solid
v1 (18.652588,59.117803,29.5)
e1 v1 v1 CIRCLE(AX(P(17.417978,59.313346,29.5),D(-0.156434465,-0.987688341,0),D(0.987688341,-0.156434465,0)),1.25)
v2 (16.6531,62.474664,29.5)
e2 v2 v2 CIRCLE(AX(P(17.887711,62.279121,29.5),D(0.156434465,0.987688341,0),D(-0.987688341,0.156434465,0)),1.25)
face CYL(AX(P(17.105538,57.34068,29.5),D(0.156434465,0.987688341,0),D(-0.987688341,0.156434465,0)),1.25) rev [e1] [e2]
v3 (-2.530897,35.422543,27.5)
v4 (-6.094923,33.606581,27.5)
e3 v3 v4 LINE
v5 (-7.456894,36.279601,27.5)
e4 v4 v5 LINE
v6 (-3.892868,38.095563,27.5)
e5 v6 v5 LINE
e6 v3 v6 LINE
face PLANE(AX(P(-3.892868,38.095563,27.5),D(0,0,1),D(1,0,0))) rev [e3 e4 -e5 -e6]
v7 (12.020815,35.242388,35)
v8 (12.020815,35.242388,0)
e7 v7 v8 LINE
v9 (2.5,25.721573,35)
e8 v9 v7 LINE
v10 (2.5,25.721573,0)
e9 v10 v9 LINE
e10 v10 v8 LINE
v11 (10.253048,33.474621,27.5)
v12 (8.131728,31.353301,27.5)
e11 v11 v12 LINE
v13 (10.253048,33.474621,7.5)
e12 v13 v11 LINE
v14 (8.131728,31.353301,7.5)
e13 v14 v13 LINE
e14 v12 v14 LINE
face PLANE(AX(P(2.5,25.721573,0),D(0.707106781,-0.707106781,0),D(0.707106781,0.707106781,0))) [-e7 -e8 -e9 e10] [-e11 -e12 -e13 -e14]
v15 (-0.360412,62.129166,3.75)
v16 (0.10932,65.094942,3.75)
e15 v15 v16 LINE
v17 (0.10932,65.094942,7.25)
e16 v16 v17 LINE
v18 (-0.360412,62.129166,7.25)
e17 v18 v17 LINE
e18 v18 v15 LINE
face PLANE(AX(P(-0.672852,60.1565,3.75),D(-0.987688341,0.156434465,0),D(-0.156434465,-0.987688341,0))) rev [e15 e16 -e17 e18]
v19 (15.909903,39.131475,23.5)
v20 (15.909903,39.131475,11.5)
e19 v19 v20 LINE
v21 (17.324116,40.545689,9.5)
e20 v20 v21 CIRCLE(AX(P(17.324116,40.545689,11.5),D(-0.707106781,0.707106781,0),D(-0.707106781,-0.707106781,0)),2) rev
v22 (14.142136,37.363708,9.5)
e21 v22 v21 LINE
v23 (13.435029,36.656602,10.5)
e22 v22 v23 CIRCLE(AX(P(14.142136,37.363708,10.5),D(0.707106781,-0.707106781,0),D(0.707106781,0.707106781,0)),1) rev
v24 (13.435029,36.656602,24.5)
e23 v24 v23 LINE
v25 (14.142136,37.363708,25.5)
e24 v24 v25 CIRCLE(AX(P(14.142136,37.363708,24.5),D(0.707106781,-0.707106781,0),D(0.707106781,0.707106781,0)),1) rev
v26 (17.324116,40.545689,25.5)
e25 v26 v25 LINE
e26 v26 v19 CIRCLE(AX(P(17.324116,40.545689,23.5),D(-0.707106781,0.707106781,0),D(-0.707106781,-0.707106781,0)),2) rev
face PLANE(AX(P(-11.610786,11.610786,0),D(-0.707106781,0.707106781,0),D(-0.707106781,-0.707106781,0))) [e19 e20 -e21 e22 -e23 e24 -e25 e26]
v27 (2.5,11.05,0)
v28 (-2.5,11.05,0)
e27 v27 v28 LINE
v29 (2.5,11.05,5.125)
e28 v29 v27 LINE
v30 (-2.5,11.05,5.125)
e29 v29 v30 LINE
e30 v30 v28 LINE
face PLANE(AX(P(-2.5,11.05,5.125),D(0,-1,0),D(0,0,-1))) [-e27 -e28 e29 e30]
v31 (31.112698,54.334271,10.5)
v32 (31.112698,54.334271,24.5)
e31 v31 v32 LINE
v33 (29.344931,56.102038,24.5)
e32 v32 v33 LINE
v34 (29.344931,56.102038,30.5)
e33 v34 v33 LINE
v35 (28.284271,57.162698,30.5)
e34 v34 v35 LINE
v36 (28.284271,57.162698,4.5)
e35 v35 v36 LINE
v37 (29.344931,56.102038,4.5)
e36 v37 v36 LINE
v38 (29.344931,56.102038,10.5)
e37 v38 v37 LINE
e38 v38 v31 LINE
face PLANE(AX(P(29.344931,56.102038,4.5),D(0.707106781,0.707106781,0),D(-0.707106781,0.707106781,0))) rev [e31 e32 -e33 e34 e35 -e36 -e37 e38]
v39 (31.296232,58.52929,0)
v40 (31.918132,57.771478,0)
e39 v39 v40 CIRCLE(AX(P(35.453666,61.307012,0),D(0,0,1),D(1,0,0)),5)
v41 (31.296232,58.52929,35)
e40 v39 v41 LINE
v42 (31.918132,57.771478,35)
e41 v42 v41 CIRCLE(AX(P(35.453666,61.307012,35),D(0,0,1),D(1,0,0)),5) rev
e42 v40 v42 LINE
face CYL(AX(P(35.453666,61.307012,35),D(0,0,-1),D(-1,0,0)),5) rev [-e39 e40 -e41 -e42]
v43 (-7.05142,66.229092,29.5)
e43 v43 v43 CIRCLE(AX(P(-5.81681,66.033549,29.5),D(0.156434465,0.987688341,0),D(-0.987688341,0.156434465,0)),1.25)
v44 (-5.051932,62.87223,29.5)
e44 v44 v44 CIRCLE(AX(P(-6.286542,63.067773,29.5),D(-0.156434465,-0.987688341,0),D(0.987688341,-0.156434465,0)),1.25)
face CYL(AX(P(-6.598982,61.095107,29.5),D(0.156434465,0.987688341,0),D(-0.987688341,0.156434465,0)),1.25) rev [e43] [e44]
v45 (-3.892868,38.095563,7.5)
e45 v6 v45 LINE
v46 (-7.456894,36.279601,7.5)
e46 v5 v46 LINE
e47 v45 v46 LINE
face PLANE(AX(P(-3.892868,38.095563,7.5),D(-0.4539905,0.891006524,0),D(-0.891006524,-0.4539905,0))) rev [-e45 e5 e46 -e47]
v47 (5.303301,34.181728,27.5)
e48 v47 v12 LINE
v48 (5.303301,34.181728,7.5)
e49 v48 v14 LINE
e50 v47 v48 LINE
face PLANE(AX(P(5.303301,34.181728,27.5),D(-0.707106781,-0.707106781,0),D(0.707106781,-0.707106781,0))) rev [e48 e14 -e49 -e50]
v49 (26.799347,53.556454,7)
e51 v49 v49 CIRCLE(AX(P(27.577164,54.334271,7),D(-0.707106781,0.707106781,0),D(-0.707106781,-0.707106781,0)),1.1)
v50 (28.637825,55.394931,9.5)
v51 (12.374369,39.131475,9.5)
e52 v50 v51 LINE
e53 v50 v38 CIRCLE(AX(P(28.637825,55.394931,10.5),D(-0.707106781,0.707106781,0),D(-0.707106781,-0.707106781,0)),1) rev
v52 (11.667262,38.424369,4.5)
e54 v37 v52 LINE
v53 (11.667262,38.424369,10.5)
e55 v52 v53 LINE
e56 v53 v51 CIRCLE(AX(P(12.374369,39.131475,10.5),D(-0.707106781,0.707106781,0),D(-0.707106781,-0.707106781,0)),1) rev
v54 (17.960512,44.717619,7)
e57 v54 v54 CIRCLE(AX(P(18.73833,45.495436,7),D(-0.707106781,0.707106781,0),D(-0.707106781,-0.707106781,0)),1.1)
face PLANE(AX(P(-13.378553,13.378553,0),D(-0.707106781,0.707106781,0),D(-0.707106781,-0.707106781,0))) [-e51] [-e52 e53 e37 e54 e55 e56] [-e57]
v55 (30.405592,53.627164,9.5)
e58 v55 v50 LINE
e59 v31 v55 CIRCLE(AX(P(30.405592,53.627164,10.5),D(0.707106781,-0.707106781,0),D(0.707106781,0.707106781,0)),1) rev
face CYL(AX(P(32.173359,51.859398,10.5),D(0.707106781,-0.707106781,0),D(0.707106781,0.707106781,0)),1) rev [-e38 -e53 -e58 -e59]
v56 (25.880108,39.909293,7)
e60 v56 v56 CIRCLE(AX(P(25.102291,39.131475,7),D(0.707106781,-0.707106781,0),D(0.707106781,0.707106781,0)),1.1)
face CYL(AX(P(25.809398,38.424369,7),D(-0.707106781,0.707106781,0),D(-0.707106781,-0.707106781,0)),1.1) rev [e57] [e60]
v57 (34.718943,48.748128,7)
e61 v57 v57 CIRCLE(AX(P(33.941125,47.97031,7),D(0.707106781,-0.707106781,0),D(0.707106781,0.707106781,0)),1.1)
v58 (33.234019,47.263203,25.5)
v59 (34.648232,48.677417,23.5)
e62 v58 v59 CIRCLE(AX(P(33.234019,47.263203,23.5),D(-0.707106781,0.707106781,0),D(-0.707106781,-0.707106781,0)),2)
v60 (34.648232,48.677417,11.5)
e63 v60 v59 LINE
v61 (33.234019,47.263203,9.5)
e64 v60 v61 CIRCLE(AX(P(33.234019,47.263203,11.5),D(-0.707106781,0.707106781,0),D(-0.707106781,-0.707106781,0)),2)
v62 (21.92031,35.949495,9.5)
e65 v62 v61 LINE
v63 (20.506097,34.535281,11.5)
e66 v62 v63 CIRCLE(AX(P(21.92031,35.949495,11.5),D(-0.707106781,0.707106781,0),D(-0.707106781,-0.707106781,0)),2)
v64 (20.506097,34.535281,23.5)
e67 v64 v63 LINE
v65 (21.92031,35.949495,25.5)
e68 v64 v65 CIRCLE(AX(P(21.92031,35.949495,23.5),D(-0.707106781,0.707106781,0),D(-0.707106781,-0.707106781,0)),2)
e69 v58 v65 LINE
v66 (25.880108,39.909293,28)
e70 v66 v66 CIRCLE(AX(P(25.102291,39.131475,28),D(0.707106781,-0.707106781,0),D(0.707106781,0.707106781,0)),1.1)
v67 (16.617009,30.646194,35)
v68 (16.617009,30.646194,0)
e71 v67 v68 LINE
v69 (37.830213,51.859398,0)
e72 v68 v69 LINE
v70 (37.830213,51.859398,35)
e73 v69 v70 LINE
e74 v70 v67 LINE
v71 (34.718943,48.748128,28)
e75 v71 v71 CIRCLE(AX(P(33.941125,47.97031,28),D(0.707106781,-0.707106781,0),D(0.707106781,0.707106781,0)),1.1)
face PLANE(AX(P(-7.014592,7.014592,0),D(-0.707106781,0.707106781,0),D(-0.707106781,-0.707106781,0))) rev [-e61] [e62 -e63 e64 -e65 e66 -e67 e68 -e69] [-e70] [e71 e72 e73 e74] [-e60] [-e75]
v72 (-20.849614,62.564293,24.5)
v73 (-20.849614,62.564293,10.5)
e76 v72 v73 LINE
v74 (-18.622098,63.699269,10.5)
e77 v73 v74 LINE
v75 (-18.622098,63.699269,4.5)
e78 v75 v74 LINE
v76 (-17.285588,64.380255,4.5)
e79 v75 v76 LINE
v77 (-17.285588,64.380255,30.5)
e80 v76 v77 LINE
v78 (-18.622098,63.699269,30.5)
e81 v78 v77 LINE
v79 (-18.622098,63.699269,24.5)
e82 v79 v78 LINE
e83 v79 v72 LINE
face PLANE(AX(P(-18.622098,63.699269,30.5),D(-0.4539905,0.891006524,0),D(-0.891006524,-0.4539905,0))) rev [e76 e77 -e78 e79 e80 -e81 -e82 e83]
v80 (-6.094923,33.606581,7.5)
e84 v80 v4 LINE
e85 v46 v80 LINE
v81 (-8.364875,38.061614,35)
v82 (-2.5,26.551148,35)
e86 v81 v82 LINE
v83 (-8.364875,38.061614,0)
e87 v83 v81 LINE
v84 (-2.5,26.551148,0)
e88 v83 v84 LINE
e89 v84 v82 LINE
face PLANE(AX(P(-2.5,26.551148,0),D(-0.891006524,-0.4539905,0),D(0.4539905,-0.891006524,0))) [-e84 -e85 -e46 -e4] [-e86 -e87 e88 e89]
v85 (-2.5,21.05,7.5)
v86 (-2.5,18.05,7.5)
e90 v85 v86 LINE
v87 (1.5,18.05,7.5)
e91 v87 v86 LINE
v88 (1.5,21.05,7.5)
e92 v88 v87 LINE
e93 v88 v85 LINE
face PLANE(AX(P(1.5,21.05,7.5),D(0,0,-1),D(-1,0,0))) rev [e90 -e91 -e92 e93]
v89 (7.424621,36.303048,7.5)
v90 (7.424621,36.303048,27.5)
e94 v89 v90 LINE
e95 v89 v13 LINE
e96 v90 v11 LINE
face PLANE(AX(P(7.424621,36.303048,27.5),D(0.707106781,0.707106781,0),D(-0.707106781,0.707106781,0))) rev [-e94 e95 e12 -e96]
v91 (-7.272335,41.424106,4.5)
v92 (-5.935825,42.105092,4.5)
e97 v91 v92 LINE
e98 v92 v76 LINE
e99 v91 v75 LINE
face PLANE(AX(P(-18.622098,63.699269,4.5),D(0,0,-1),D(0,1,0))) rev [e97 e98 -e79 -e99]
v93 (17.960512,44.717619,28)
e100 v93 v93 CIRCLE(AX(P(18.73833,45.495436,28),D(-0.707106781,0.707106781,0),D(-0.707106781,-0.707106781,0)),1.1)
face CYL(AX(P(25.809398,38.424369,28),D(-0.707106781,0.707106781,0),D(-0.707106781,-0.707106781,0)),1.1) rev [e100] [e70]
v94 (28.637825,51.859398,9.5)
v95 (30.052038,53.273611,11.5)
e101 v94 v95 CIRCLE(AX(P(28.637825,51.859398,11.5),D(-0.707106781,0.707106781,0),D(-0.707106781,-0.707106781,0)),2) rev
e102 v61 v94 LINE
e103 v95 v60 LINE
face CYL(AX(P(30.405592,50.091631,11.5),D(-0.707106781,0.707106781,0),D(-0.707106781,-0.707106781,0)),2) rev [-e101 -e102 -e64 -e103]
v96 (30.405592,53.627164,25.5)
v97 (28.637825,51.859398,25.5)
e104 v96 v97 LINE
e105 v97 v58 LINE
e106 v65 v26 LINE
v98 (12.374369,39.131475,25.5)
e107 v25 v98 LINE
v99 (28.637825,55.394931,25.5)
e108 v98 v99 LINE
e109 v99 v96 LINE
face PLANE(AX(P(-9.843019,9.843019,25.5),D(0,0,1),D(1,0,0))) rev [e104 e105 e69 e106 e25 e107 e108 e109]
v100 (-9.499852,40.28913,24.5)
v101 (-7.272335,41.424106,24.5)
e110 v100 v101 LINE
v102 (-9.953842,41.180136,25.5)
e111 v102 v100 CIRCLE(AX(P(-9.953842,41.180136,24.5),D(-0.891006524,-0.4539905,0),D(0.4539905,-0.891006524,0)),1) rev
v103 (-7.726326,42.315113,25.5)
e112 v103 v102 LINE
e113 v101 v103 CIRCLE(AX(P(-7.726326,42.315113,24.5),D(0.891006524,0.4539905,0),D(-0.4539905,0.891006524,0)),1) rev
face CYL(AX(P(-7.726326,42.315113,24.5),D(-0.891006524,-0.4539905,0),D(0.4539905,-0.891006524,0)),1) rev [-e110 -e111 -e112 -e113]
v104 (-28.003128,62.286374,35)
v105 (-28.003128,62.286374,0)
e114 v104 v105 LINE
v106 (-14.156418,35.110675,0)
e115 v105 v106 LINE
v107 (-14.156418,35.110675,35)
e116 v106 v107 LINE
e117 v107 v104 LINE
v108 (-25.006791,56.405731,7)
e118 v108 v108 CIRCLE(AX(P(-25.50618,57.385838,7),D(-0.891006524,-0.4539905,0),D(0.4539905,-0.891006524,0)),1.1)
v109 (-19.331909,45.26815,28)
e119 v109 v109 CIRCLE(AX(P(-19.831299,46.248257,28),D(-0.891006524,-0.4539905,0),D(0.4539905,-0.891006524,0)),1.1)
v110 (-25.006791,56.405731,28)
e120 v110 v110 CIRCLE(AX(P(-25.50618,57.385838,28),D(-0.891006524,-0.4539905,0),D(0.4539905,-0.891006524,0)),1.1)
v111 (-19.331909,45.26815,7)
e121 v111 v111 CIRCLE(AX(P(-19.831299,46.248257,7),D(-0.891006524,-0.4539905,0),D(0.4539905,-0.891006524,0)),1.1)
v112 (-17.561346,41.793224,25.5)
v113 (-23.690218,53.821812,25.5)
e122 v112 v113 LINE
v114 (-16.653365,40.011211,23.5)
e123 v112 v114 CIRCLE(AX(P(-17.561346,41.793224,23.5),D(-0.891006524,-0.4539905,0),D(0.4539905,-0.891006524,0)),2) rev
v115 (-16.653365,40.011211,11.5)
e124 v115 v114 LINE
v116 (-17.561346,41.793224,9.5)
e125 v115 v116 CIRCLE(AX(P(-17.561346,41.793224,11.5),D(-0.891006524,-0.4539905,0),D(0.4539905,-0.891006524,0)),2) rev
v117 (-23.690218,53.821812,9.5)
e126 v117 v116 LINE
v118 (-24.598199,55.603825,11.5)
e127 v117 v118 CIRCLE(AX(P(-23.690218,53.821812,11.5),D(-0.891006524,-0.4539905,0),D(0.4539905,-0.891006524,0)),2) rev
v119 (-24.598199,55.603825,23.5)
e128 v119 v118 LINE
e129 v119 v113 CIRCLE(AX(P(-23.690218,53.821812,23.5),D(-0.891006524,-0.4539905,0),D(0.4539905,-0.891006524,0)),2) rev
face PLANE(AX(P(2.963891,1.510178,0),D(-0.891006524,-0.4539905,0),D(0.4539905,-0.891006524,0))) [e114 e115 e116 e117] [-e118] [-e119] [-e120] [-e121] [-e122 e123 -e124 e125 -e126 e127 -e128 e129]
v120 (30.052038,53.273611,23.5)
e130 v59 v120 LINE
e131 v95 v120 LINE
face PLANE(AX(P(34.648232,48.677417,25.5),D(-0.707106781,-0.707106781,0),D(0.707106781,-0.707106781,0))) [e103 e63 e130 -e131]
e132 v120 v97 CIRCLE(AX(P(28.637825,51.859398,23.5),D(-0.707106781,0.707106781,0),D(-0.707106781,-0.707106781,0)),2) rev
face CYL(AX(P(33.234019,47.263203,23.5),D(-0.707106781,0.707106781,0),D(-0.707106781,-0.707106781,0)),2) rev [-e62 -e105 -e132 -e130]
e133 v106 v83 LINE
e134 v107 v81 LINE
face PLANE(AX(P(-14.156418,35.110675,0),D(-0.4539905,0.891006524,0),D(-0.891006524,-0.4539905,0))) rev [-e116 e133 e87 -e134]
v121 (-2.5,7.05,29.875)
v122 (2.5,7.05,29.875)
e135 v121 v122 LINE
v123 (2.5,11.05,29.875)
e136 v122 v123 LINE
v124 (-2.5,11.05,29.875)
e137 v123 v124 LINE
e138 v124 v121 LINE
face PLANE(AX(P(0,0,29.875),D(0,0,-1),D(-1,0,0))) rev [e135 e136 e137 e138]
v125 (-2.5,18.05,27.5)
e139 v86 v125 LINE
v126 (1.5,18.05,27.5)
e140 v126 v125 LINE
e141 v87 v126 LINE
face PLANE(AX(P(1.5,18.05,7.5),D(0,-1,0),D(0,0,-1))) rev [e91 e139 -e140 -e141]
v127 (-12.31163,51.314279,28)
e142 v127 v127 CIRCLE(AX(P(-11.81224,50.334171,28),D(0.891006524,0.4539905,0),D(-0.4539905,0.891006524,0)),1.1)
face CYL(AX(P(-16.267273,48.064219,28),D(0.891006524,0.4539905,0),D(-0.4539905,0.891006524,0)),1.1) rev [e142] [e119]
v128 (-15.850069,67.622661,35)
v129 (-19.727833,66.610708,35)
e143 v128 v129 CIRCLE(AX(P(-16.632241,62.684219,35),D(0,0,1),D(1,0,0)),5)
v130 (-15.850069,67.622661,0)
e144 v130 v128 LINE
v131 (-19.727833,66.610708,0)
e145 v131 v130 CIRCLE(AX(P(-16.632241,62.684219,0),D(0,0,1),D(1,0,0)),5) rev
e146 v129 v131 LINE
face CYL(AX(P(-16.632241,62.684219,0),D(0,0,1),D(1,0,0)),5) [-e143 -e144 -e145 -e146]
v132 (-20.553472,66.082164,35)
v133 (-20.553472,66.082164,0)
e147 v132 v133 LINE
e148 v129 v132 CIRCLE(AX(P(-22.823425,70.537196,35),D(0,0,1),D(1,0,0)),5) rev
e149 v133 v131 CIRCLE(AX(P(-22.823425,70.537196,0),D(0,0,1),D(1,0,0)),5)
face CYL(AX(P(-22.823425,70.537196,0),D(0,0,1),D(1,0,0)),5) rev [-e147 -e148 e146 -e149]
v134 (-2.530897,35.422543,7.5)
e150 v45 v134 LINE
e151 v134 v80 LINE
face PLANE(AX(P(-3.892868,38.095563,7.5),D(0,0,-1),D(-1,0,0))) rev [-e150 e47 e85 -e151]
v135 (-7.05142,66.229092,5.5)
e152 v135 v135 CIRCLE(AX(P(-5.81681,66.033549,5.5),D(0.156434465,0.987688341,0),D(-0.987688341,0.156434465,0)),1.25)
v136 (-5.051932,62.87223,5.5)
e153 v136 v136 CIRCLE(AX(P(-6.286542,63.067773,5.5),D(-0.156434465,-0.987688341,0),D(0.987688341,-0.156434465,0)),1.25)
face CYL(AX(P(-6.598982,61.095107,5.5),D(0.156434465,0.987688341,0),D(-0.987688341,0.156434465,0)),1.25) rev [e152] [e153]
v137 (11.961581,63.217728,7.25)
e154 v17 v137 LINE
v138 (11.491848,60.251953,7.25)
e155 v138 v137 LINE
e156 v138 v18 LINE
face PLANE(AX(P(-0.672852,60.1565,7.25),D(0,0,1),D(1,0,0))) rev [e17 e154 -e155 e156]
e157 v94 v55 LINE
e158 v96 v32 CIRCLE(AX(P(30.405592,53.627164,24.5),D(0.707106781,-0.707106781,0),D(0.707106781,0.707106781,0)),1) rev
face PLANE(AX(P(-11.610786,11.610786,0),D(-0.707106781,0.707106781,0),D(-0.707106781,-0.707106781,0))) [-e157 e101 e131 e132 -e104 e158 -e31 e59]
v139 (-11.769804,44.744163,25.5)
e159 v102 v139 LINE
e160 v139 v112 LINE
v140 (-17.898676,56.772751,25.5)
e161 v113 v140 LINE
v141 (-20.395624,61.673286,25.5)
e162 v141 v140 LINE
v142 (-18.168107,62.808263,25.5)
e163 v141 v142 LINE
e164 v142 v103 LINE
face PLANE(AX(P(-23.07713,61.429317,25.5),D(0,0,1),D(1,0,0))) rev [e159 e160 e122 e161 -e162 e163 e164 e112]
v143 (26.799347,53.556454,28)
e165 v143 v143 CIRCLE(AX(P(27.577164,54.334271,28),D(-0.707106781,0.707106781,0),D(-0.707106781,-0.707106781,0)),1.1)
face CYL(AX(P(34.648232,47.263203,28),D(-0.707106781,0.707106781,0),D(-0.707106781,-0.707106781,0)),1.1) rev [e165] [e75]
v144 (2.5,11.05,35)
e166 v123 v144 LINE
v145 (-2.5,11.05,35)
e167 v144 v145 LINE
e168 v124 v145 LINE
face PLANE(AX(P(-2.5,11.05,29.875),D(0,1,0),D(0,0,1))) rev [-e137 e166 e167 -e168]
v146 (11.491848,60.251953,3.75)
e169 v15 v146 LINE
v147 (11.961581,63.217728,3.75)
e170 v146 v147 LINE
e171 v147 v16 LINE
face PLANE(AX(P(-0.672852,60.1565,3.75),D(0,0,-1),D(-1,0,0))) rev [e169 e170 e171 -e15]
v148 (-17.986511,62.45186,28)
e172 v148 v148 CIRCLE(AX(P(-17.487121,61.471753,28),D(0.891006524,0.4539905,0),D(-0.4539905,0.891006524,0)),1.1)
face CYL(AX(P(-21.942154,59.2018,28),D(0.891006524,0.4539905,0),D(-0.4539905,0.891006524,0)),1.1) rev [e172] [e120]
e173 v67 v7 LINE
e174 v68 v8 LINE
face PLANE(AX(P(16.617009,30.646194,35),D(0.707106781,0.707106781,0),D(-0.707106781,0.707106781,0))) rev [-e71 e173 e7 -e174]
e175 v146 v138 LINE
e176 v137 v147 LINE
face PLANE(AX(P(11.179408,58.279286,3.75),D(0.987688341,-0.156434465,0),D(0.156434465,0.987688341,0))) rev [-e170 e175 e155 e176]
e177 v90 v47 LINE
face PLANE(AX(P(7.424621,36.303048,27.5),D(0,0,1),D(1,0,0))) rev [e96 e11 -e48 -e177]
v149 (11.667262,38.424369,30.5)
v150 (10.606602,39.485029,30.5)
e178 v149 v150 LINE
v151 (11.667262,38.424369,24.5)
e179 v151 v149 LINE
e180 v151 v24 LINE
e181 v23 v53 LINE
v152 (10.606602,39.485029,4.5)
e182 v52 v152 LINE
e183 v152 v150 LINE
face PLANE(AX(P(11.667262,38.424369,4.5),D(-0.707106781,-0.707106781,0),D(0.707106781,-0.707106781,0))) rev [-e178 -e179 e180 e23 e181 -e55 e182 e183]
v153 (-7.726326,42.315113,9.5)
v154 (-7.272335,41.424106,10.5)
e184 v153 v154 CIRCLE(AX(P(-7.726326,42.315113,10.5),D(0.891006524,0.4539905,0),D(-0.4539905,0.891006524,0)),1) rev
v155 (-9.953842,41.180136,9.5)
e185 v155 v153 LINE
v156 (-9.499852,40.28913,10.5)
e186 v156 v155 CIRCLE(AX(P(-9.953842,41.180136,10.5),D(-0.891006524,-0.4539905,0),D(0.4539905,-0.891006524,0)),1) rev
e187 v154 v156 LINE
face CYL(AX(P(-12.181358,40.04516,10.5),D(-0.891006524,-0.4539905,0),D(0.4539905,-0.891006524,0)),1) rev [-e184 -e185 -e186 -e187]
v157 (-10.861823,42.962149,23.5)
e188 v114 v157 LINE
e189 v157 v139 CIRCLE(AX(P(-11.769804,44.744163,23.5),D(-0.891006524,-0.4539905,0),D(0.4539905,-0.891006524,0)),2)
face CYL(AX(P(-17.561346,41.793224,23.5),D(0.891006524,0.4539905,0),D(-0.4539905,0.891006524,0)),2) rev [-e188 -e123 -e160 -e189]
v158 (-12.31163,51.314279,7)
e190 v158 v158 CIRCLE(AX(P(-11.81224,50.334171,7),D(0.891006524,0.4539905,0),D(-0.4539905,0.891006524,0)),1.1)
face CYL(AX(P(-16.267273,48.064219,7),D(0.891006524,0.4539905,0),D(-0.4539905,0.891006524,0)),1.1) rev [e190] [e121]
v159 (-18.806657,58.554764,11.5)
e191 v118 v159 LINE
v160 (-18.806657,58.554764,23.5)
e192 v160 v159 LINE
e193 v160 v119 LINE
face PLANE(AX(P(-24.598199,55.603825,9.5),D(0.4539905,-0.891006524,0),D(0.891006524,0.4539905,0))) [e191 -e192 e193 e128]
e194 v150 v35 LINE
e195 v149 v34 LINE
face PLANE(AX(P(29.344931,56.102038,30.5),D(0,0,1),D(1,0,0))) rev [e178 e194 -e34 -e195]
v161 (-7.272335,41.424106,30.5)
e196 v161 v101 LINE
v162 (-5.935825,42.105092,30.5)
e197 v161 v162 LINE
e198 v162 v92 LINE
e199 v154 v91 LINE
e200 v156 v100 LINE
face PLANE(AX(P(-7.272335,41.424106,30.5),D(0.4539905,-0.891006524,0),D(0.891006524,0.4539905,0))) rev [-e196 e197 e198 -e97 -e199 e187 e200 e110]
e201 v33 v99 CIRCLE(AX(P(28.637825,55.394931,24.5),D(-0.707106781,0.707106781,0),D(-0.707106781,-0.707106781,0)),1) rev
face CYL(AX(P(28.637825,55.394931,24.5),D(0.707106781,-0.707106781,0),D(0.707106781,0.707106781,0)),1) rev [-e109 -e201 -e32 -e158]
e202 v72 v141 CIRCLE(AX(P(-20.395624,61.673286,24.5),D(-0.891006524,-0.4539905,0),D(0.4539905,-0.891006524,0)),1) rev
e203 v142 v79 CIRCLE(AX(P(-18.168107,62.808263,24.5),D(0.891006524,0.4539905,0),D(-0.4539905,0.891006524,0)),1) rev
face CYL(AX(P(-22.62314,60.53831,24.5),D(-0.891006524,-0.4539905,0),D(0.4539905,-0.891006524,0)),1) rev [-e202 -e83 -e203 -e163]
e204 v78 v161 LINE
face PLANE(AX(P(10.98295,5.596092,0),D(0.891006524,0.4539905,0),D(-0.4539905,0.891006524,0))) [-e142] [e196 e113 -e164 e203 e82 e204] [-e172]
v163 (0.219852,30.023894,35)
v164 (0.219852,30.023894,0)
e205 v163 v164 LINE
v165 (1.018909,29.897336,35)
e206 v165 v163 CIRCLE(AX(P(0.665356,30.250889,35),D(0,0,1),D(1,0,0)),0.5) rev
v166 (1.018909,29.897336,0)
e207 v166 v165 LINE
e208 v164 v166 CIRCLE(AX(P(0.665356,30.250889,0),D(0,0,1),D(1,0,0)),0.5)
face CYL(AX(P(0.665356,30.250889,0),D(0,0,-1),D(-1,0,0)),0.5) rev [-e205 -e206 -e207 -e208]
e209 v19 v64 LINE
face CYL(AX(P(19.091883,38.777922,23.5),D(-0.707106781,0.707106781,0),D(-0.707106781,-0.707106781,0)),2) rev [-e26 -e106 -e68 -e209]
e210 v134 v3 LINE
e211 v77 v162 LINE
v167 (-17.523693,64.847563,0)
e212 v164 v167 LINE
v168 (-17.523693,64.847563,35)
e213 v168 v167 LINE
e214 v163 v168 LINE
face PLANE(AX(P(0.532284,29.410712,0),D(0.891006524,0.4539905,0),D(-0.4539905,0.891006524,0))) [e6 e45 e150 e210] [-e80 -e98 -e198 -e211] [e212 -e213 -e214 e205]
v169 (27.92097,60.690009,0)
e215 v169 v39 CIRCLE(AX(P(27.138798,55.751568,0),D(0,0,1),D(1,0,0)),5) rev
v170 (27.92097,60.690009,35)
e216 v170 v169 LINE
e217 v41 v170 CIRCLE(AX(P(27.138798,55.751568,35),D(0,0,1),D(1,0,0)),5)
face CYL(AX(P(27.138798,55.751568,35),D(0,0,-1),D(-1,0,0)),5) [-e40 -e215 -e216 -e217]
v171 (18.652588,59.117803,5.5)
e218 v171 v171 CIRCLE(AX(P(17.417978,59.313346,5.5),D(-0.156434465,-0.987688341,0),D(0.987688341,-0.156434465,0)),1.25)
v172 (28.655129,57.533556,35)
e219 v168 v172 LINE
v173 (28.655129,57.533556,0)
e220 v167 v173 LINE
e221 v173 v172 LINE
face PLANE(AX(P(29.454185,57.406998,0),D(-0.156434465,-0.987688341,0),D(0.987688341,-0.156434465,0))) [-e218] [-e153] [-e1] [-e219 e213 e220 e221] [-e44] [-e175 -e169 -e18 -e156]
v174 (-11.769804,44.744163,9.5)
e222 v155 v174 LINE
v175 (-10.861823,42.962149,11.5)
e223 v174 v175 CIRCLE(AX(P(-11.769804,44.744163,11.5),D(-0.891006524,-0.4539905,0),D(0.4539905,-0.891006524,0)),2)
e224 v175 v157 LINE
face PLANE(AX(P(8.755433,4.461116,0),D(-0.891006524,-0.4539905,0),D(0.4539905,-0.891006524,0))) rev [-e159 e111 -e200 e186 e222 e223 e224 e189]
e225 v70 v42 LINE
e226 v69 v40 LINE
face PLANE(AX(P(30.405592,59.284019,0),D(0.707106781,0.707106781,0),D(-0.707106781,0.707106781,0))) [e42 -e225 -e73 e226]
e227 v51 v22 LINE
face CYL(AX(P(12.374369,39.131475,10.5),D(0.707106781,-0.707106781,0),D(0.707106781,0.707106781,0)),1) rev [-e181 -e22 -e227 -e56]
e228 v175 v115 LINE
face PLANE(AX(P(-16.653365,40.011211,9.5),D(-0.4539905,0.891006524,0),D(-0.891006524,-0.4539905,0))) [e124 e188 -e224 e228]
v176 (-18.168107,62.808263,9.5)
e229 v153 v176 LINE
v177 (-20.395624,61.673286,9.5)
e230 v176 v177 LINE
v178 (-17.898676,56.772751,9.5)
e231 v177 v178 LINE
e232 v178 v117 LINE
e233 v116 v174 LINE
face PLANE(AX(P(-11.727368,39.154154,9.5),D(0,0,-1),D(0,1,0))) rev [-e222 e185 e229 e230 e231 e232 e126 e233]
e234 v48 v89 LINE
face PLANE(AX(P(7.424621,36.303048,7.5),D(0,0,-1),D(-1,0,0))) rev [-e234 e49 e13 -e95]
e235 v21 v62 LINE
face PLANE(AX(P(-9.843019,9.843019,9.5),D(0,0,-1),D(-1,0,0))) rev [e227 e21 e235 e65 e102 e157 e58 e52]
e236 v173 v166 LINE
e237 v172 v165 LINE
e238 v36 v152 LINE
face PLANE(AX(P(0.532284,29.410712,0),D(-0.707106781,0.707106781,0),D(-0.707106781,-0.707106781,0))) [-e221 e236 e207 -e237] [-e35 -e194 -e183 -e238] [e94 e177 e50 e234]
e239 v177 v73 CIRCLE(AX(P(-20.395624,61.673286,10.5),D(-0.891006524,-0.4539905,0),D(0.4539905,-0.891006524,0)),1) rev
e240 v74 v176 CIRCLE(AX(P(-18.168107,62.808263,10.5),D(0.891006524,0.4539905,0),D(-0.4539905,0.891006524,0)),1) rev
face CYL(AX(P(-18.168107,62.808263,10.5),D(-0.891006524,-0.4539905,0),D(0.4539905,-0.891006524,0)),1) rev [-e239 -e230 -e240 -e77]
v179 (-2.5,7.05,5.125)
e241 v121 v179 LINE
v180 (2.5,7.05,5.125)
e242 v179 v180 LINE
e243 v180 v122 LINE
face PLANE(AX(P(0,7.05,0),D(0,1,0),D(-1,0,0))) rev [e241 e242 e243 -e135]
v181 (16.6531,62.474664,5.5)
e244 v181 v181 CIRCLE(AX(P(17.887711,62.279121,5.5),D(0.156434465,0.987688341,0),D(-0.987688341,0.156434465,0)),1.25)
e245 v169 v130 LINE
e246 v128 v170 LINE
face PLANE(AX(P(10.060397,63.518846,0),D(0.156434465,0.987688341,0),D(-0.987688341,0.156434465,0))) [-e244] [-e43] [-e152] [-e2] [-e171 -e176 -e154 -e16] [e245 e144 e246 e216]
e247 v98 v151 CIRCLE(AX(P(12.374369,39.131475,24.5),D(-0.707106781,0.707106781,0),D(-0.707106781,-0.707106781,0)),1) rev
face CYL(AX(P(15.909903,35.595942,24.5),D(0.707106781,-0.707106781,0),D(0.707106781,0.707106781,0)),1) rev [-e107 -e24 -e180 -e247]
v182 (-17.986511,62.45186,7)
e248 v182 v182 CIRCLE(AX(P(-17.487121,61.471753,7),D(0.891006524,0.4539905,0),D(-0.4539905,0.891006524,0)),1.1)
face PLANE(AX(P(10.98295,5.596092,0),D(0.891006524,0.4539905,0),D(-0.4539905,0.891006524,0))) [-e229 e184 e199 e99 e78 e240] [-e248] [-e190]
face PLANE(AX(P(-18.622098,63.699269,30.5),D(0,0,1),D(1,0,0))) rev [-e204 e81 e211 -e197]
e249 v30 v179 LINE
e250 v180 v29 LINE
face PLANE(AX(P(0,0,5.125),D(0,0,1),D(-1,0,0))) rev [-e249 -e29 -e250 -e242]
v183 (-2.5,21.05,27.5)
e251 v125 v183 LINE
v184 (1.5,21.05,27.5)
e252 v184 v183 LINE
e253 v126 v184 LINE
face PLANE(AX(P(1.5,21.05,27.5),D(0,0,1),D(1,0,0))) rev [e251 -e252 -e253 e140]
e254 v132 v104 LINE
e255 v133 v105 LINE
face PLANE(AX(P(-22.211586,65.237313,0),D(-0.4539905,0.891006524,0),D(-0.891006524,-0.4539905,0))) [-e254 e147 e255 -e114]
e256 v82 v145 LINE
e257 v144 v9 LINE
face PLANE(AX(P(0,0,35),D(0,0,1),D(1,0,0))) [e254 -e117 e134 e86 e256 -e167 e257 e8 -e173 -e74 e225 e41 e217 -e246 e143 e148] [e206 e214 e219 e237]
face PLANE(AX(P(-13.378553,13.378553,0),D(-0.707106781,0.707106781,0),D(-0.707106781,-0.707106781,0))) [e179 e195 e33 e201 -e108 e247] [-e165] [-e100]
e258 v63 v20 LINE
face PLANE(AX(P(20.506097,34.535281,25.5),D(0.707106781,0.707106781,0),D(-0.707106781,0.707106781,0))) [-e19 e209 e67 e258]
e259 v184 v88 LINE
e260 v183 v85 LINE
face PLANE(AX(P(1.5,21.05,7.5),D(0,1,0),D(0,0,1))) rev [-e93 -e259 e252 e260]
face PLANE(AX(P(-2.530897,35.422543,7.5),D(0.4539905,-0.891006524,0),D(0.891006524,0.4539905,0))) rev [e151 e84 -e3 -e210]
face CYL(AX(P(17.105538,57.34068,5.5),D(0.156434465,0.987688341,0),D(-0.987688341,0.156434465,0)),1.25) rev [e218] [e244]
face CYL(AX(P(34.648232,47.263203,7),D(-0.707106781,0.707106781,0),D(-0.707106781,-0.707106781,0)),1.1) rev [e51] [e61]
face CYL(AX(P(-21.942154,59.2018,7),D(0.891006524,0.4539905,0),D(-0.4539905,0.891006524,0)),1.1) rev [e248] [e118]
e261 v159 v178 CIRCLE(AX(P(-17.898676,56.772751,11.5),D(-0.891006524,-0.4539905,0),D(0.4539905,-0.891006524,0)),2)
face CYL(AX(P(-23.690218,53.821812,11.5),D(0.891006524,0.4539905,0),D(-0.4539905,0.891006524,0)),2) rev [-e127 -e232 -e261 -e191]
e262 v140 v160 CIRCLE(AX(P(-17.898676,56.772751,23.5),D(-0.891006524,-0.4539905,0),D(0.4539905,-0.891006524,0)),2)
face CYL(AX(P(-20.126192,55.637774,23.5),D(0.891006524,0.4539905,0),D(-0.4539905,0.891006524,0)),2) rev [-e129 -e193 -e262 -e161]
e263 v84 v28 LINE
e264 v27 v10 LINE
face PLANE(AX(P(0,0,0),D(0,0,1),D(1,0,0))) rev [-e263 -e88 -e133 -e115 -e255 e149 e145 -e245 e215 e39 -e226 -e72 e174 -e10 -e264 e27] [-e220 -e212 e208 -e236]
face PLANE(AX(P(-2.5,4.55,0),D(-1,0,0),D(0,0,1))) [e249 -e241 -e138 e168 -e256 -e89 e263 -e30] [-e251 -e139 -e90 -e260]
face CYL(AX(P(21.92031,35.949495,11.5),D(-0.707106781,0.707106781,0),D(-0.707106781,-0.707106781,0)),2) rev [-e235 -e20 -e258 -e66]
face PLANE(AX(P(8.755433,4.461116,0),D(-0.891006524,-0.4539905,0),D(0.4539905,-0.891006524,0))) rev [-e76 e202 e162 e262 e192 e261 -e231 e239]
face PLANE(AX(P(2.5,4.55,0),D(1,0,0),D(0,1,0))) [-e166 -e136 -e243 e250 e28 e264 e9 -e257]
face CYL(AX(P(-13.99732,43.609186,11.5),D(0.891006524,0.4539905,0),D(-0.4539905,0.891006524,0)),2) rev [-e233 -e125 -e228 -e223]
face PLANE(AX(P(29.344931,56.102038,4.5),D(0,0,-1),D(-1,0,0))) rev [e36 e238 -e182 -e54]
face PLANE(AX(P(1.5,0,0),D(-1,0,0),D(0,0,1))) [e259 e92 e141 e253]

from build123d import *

# Parameters (mm, degrees)
BOSS_EXTRUDE1_DEPTH      = 35
BOSS_EXTRUDE2_DEPTH      = 35
FILLET1_R                = 0.5
SKETCH3_W                = 26
SKETCH3_H                = 25
CUT_EXTRUDE1_DEPTH       = 1.5
SKETCH4_W                = 16
SKETCH4_H                = 25
CUT_EXTRUDE2_DEPTH       = 5
FILLET3_R                = 1
SKETCH5_W                = 26
SKETCH5_H                = 25
CUT_EXTRUDE3_DEPTH       = 1.5
SKETCH6_W                = 16
SKETCH6_H                = 25
CUT_EXTRUDE4_DEPTH       = 5
FILLET4_R                = 1
SKETCH8_W                = 20
SKETCH8_H                = 3
CUT_EXTRUDE5_DEPTH       = 4
SKETCH9_W                = 20
SKETCH9_H                = 3
CUT_EXTRUDE6_DEPTH       = 4
SKETCH10_W               = 20
SKETCH10_H               = 3
CUT_EXTRUDE7_DEPTH       = 4
SKETCH11_R               = 1.1
CUT_EXTRUDE8_DEPTH       = 10
SKETCH12_R               = 1.1
CUT_EXTRUDE9_DEPTH       = 5
BOSS_EXTRUDE3_DEPTH      = 3.5
BOSS_EXTRUDE3_DEPTH_BACK = 1
SKETCH14_W               = 35
SKETCH14_H               = 3.801557548
SKETCH15_W               = 1.5
SKETCH15_H               = 31
CUT_EXTRUDE10_DEPTH      = 5
SKETCH18_W               = 35
SKETCH18_H               = 30
SKETCH18_R               = 1.1
SKETCH18_W_2             = 16
SKETCH18_H_2             = 20
BOSS_EXTRUDE4_DEPTH      = 6.5
SKETCH19_W               = 35
SKETCH19_H               = 30.5
SKETCH19_R               = 1.1
SKETCH19_W_2             = 16
SKETCH19_H_2             = 17.5
BOSS_EXTRUDE5_DEPTH      = 6.5
CUT_EXTRUDE12_DEPTH      = 2.5
CUT_EXTRUDE12_DEPTH_BACK = 10
SKETCH20_W               = 93.401628658
SKETCH20_H               = 53.255346894
SKETCH21_W               = 5
SKETCH21_H               = 4
CUT_EXTRUDE13_DEPTH      = 5.125
FILLET9_R                = 2
FILLET10_R               = 2
BOSS_EXTRUDE6_DEPTH      = 35
SKETCH23_W               = 49.664604729
SKETCH23_H               = 35
BOSS_EXTRUDE7_DEPTH      = 1
SKETCH24_R               = 1.25
SKETCH24_W               = 12
SKETCH24_H               = 3.5
CUT_EXTRUDE14_DEPTH      = 5
FILLET13_R               = 5
FILLET14_R               = 5


with BuildPart() as part:
    # Sketch1 → Boss-Extrude1 (new body)
    with BuildSketch(Plane.XY):
        Polygon((6.55, 4.55), (-6.55, 4.55), (-6.55, -4.55), (-2.05, -4.55), (-2.05, -2.05), (-4.05, -2.05), (-4.05, 2.05), (4.05, 2.05), (4.05, -2.05), (2.05, -2.05), (2.05, -4.55), (6.55, -4.55), align=None)
    extrude(amount=BOSS_EXTRUDE1_DEPTH)

    # Sketch2 → Boss-Extrude2 (add, through all)
    with BuildSketch(Plane.XY.offset(35)):
        Polygon((2.5, 4.55), (2.5, 25.721572875), (33.234018716, 56.455591591), (30.405591591, 59.284018716), (0.532284417, 29.410711541), (-18.64755944, 67.053274588), (-22.211585537, 65.237312589), (-2.5, 26.551147735), (-2.5, 4.55), align=None)
    extrude(amount=-BOSS_EXTRUDE2_DEPTH)

    # Fillet1
    fillet1_edges = [part.edges().sort_by_distance(p)[0] for p in [
        (0.532284417, 29.410711541, 17.5),
    ]]
    fillet(fillet1_edges, radius=FILLET1_R)

    # Sketch3 → Cut-Extrude1 (cut)
    with BuildSketch(Plane(origin=(-14.439213562, 14.439213562, 0), x_dir=(0, 0, 1), z_dir=(-0.7071067811865464, 0.7071067811865488, 0))):
        with Locations((17.5, 47.92013165)):
            Rectangle(SKETCH3_W, SKETCH3_H)
    extrude(amount=-CUT_EXTRUDE1_DEPTH, mode=Mode.SUBTRACT)

    # Sketch4 → Cut-Extrude2 (cut)
    with BuildSketch(Plane(origin=(-13.378553391, 13.378553391, 0), x_dir=(0, 0, 1), z_dir=(-0.7071067811865461, 0.707106781186549, 0))):
        with Locations((17.5, 47.92013165)):
            Rectangle(SKETCH4_W, SKETCH4_H)
    extrude(amount=-CUT_EXTRUDE2_DEPTH, mode=Mode.SUBTRACT)

    # Fillet3
    fillet3_edges = [part.edges().sort_by_distance(p)[0] for p in [
        (30.228814896, 55.218154724, 9.5),
        (30.228814896, 55.218154724, 25.5),
        (12.551145366, 37.540485194, 25.5),
        (12.551145366, 37.540485194, 9.5),
    ]]
    fillet(fillet3_edges, radius=FILLET3_R)

    # Sketch5 → Cut-Extrude3 (cut)
    with BuildSketch(Plane(origin=(12.3194594, 6.277078088, 0), x_dir=(0, 0, -1), z_dir=(0.8910065241883675, 0.45399049973954786, 0))):
        with Locations((-17.5, 52.710719955)):
            Rectangle(SKETCH5_W, SKETCH5_H)
    extrude(amount=-CUT_EXTRUDE3_DEPTH, mode=Mode.SUBTRACT)

    # Sketch6 → Cut-Extrude4 (cut)
    with BuildSketch(Plane(origin=(10.982949614, 5.596092339, 0), x_dir=(0, 0, -1), z_dir=(0.8910065241883673, 0.4539904997395479, 0))):
        with Locations((-17.5, 52.710719955)):
            Rectangle(SKETCH6_W, SKETCH6_H)
    extrude(amount=-CUT_EXTRUDE4_DEPTH, mode=Mode.SUBTRACT)

    # Fillet4
    fillet4_edges = [part.edges().sort_by_distance(p)[0] for p in [
        (-19.735855882, 63.131781141, 25.5),
        (-19.735855882, 63.131781141, 9.5),
        (-8.386093389, 40.856618036, 9.5),
        (-8.386093389, 40.856618036, 25.5),
    ]]
    fillet(fillet4_edges, radius=FILLET4_R)

    # Sketch8 → Cut-Extrude5 (cut)
    with BuildSketch(Plane(origin=(-11.610786438, 11.610786438, 0), x_dir=(0, 0, -1), z_dir=(0.7071067811865465, -0.7071067811865487, 0))):
        with Locations((-17.5, 29.42013165)):
            Rectangle(SKETCH8_W, SKETCH8_H)
    extrude(amount=-CUT_EXTRUDE5_DEPTH, mode=Mode.SUBTRACT)

    # Sketch9 → Cut-Extrude6 (cut)
    with BuildSketch(Plane(origin=(8.755433303, 4.461116089, 0), x_dir=(0, 0, 1), z_dir=(-0.8910065241883675, -0.45399049973954797, 0))):
        with Locations((17.5, 34.210719955)):
            Rectangle(SKETCH9_W, SKETCH9_H)
    extrude(amount=-CUT_EXTRUDE6_DEPTH, mode=Mode.SUBTRACT)

    # Sketch10 → Cut-Extrude7 (cut)
    with BuildSketch(Plane.ZY.offset(2.5)):
        with Locations((17.5, 19.55)):
            Rectangle(SKETCH10_W, SKETCH10_H)
    extrude(amount=-CUT_EXTRUDE7_DEPTH, mode=Mode.SUBTRACT)

    # Sketch11 → Cut-Extrude8 (cut)
    with BuildSketch(Plane(origin=(-13.378553391, 13.378553391, 0), x_dir=(0, 0, 1), z_dir=(-0.7071067811865461, 0.707106781186549, 0))):
        with Locations(Location((28, 57.92013165, 0), (0, 0, 270))):
            Circle(SKETCH11_R)
        with Locations(Location((7, 57.92013165, 0), (0, 0, 270))):
            Circle(SKETCH11_R)
        with Locations(Location((28, 45.42013165, 0), (0, 0, 270))):
            Circle(SKETCH11_R)
        with Locations(Location((7, 45.42013165, 0), (0, 0, 270))):
            Circle(SKETCH11_R)
    extrude(amount=-CUT_EXTRUDE8_DEPTH, mode=Mode.SUBTRACT)

    # Sketch12 → Cut-Extrude9 (cut)
    with BuildSketch(Plane(origin=(10.982949614, 5.596092339, 0), x_dir=(0, 0, -1), z_dir=(0.8910065241883673, 0.4539904997395479, 0))):
        with Locations(Location((-7, 62.710719955, 0), (0, 0, 90))):
            Circle(SKETCH12_R)
        with Locations(Location((-28, 62.710719955, 0), (0, 0, 90))):
            Circle(SKETCH12_R)
        with Locations(Location((-7, 50.210719955, 0), (0, 0, 90))):
            Circle(SKETCH12_R)
        with Locations(Location((-28, 50.210719955, 0), (0, 0, 90))):
            Circle(SKETCH12_R)
    extrude(amount=-CUT_EXTRUDE9_DEPTH, mode=Mode.SUBTRACT)

    # Sketch14 → Boss-Extrude3 (add, two sides: drawn at the far end of the back side and taken through both)
    with BuildSketch(Plane(origin=(6.55, 0, 0), x_dir=(0, 0, -1), z_dir=(1, 0, 0)).offset(-BOSS_EXTRUDE3_DEPTH_BACK)):
        with Locations((-17.5, -0.05)):
            Rectangle(SKETCH14_W, SKETCH14_H)
    extrude(amount=BOSS_EXTRUDE3_DEPTH + BOSS_EXTRUDE3_DEPTH_BACK)

    # Sketch15 → Cut-Extrude10 (cut)
    with BuildSketch(Plane(origin=(0, 1.850778774, 0), x_dir=(1, 0, 0), z_dir=(0, 1, 0))):
        with Locations((7.3, -17.5)):
            Rectangle(SKETCH15_W, SKETCH15_H)
    extrude(amount=-CUT_EXTRUDE10_DEPTH, mode=Mode.SUBTRACT)

    # Sketch18 → Boss-Extrude4 (add)
    with BuildSketch(Plane(origin=(-11.610786438, 11.610786438, 0), x_dir=(0, 0, -1), z_dir=(0.7071067811865465, -0.7071067811865487, 0))):
        with Locations((-17.5, 48.42013165)):
            Rectangle(SKETCH18_W, SKETCH18_H)
        with Locations(Location((-7, 57.92013165, 0), (0, 0, 270))):
            Circle(SKETCH18_R, mode=Mode.SUBTRACT)
        with Locations(Location((-7, 45.42013165, 0), (0, 0, 270))):
            Circle(SKETCH18_R, mode=Mode.SUBTRACT)
        with Locations(Location((-28, 45.42013165, 0), (0, 0, 270))):
            Circle(SKETCH18_R, mode=Mode.SUBTRACT)
        with Locations(Location((-28, 57.92013165, 0), (0, 0, 270))):
            Circle(SKETCH18_R, mode=Mode.SUBTRACT)
        with Locations((-17.5, 48.92013165)):
            Rectangle(SKETCH18_W_2, SKETCH18_H_2, mode=Mode.SUBTRACT)
    extrude(amount=BOSS_EXTRUDE4_DEPTH)

    # Sketch19 → Boss-Extrude5 (add)
    with BuildSketch(Plane(origin=(8.755433303, 4.461116089, 0), x_dir=(0, 0, 1), z_dir=(-0.8910065241883673, -0.45399049973954797, 0))):
        with Locations((17.5, 52.960719955)):
            Rectangle(SKETCH19_W, SKETCH19_H)
        with Locations(Location((28, 50.210719955, 0), (0, 0, 90))):
            Circle(SKETCH19_R, mode=Mode.SUBTRACT)
        with Locations(Location((7, 50.210719955, 0), (0, 0, 90))):
            Circle(SKETCH19_R, mode=Mode.SUBTRACT)
        with Locations(Location((7, 62.710719955, 0), (0, 0, 90))):
            Circle(SKETCH19_R, mode=Mode.SUBTRACT)
        with Locations(Location((28, 62.710719955, 0), (0, 0, 90))):
            Circle(SKETCH19_R, mode=Mode.SUBTRACT)
        with Locations((17.5, 51.960719955)):
            Rectangle(SKETCH19_W_2, SKETCH19_H_2, mode=Mode.SUBTRACT)
    extrude(amount=BOSS_EXTRUDE5_DEPTH)

    # Sketch20 → Cut-Extrude12 (cut, two sides: drawn at the far end of the back side and taken through both)
    with BuildSketch(Plane(origin=(0, 4.55, 0), x_dir=(1, 0, 0), z_dir=(0, 1, 0)).offset(-CUT_EXTRUDE12_DEPTH_BACK)):
        with Locations((0, -16.396538254)):
            Rectangle(SKETCH20_W, SKETCH20_H)
    extrude(amount=CUT_EXTRUDE12_DEPTH + CUT_EXTRUDE12_DEPTH_BACK, mode=Mode.SUBTRACT)

    # Sketch21 → Cut-Extrude13 (cut)
    with BuildSketch(Plane.XY.offset(35)):
        with Locations((0, 9.05)):
            Rectangle(SKETCH21_W, SKETCH21_H)
    cut_extrude13 = extrude(amount=-CUT_EXTRUDE13_DEPTH, mode=Mode.SUBTRACT)

    # Mirror1: Cut-Extrude13 across plane
    add(cut_extrude13.mirror(Plane(origin=(0, 0, 17.5), x_dir=(1, 0, 0), z_dir=(0, 0, -1))), mode=Mode.SUBTRACT)

    # Fillet9
    fillet9_edges = [part.edges().sort_by_distance(p)[0] for p in [
        (-21.702427992, 57.079294533, 9.5),
        (-13.757594247, 41.48668036, 9.5),
        (-13.757594247, 41.48668036, 25.5),
        (-21.702427992, 57.079294533, 25.5),
    ]]
    fillet(fillet9_edges, radius=FILLET9_R)

    # Fillet10
    fillet10_edges = [part.edges().sort_by_distance(p)[0] for p in [
        (32.350135239, 50.975514037, 25.5),
        (18.207999616, 36.833378413, 25.5),
        (18.207999616, 36.833378413, 9.5),
        (32.350135239, 50.975514037, 9.5),
    ]]
    fillet(fillet10_edges, radius=FILLET10_R)

    # Sketch22 → Boss-Extrude6 (add, through all)
    with BuildSketch(Plane.XY.offset(35)):
        Polygon((-18.075827696, 64.935012284), (29.454185425, 57.406997757), (32.814896967, 56.87471334), (30.405591591, 59.284018716), (-18.64755944, 67.053274588), (-20.449809722, 65.9700605), align=None)
    extrude(amount=-BOSS_EXTRUDE6_DEPTH)

    # Sketch23 → Boss-Extrude7 (add)
    with BuildSketch(Plane(origin=(9.903962427, 62.531157777, 0), x_dir=(0.9876883405951378, -0.15643446504023123, 0), z_dir=(0.15643446504023123, 0.9876883405951378, 0))):
        with Locations((-4.075117815, -17.5)):
            Rectangle(SKETCH23_W, SKETCH23_H)
    extrude(amount=BOSS_EXTRUDE7_DEPTH)

    # Sketch24 → Cut-Extrude14 (cut)
    with BuildSketch(Plane(origin=(10.060396892, 63.518846117, 0), x_dir=(0.9876883405951378, -0.15643446504023123, 0), z_dir=(0.15643446504023123, 0.9876883405951378, 0))):
        with Locations(Location((-16.075117814, -5.5, 0), (0, 0, 180))):
            Circle(SKETCH24_R)
        with Locations(Location((7.924882186, -5.5, 0), (0, 0, 180))):
            Circle(SKETCH24_R)
        with Locations(Location((7.924882186, -29.5, 0), (0, 0, 180))):
            Circle(SKETCH24_R)
        with Locations(Location((-16.075117814, -29.5, 0), (0, 0, 180))):
            Circle(SKETCH24_R)
        with Locations((-4.075117814, -5.5)):
            Rectangle(SKETCH24_W, SKETCH24_H)
    extrude(amount=-CUT_EXTRUDE14_DEPTH, mode=Mode.SUBTRACT)

    # Fillet13
    # the kernel refuses this fillet: 5 mm, written as the material it adds along each edge
    with BuildSketch(Plane(origin=(-18.64755944, 67.053274588, 35), x_dir=(0.15643446504022016, 0.9876883405951395, 0), z_dir=(0, 0, -1))) as fillet13_piece_1:
        with BuildLine():
            CenterArc((2.787779592, -4.669458655), FILLET13_R, 110.950172263, 33.049827737)
            Line((-1.25730538, -1.730532394), (-1.338207079, -1.671753868))
            Line((-1.338207079, -1.671753868), (-0.080901699, 0.058778525))
            Line((-0.080901699, 0.058778525), (0, 0.1))
            ThreePointArc((0, 0.1), (0.5, 0.1), (0.964244408, 0.093389173))
            Line((0.964244408, 0.093389173), (1, 0))
        make_face()
    extrude(amount=35)
    with BuildSketch(Plane(origin=(30.405591591, 59.284018716, 35), x_dir=(0.7071067811865468, -0.7071067811865485, 0), z_dir=(0, 0, -1))) as fillet13_piece_2:
        with BuildLine():
            CenterArc((2.139055676, -5), FILLET13_R, 90, 33.049827737)
            Line((-0.587785252, -0.809016994), (-0.642322071, -0.725197334))
            ThreePointArc((-0.642322071, -0.725197334), (-0.374794326, -0.345729972), (-0.080901699, 0.058778525))
            Line((-0.080901699, 0.058778525), (0, 0.1))
            Line((0, 0.1), (2.139055676, 0.1))
            Line((2.139055676, 0.1), (2.139055676, 0))
        make_face()
    extrude(amount=35)

    # Fillet14
    fillet14_edges = [part.edges().sort_by_distance(p)[0] for p in [
        (-18.491124975, 68.040962929, 17.5),
        (30.562026056, 60.271707056, 17.5),
    ]]
    fillet(fillet14_edges, radius=FILLET14_R)


solid = part.part
